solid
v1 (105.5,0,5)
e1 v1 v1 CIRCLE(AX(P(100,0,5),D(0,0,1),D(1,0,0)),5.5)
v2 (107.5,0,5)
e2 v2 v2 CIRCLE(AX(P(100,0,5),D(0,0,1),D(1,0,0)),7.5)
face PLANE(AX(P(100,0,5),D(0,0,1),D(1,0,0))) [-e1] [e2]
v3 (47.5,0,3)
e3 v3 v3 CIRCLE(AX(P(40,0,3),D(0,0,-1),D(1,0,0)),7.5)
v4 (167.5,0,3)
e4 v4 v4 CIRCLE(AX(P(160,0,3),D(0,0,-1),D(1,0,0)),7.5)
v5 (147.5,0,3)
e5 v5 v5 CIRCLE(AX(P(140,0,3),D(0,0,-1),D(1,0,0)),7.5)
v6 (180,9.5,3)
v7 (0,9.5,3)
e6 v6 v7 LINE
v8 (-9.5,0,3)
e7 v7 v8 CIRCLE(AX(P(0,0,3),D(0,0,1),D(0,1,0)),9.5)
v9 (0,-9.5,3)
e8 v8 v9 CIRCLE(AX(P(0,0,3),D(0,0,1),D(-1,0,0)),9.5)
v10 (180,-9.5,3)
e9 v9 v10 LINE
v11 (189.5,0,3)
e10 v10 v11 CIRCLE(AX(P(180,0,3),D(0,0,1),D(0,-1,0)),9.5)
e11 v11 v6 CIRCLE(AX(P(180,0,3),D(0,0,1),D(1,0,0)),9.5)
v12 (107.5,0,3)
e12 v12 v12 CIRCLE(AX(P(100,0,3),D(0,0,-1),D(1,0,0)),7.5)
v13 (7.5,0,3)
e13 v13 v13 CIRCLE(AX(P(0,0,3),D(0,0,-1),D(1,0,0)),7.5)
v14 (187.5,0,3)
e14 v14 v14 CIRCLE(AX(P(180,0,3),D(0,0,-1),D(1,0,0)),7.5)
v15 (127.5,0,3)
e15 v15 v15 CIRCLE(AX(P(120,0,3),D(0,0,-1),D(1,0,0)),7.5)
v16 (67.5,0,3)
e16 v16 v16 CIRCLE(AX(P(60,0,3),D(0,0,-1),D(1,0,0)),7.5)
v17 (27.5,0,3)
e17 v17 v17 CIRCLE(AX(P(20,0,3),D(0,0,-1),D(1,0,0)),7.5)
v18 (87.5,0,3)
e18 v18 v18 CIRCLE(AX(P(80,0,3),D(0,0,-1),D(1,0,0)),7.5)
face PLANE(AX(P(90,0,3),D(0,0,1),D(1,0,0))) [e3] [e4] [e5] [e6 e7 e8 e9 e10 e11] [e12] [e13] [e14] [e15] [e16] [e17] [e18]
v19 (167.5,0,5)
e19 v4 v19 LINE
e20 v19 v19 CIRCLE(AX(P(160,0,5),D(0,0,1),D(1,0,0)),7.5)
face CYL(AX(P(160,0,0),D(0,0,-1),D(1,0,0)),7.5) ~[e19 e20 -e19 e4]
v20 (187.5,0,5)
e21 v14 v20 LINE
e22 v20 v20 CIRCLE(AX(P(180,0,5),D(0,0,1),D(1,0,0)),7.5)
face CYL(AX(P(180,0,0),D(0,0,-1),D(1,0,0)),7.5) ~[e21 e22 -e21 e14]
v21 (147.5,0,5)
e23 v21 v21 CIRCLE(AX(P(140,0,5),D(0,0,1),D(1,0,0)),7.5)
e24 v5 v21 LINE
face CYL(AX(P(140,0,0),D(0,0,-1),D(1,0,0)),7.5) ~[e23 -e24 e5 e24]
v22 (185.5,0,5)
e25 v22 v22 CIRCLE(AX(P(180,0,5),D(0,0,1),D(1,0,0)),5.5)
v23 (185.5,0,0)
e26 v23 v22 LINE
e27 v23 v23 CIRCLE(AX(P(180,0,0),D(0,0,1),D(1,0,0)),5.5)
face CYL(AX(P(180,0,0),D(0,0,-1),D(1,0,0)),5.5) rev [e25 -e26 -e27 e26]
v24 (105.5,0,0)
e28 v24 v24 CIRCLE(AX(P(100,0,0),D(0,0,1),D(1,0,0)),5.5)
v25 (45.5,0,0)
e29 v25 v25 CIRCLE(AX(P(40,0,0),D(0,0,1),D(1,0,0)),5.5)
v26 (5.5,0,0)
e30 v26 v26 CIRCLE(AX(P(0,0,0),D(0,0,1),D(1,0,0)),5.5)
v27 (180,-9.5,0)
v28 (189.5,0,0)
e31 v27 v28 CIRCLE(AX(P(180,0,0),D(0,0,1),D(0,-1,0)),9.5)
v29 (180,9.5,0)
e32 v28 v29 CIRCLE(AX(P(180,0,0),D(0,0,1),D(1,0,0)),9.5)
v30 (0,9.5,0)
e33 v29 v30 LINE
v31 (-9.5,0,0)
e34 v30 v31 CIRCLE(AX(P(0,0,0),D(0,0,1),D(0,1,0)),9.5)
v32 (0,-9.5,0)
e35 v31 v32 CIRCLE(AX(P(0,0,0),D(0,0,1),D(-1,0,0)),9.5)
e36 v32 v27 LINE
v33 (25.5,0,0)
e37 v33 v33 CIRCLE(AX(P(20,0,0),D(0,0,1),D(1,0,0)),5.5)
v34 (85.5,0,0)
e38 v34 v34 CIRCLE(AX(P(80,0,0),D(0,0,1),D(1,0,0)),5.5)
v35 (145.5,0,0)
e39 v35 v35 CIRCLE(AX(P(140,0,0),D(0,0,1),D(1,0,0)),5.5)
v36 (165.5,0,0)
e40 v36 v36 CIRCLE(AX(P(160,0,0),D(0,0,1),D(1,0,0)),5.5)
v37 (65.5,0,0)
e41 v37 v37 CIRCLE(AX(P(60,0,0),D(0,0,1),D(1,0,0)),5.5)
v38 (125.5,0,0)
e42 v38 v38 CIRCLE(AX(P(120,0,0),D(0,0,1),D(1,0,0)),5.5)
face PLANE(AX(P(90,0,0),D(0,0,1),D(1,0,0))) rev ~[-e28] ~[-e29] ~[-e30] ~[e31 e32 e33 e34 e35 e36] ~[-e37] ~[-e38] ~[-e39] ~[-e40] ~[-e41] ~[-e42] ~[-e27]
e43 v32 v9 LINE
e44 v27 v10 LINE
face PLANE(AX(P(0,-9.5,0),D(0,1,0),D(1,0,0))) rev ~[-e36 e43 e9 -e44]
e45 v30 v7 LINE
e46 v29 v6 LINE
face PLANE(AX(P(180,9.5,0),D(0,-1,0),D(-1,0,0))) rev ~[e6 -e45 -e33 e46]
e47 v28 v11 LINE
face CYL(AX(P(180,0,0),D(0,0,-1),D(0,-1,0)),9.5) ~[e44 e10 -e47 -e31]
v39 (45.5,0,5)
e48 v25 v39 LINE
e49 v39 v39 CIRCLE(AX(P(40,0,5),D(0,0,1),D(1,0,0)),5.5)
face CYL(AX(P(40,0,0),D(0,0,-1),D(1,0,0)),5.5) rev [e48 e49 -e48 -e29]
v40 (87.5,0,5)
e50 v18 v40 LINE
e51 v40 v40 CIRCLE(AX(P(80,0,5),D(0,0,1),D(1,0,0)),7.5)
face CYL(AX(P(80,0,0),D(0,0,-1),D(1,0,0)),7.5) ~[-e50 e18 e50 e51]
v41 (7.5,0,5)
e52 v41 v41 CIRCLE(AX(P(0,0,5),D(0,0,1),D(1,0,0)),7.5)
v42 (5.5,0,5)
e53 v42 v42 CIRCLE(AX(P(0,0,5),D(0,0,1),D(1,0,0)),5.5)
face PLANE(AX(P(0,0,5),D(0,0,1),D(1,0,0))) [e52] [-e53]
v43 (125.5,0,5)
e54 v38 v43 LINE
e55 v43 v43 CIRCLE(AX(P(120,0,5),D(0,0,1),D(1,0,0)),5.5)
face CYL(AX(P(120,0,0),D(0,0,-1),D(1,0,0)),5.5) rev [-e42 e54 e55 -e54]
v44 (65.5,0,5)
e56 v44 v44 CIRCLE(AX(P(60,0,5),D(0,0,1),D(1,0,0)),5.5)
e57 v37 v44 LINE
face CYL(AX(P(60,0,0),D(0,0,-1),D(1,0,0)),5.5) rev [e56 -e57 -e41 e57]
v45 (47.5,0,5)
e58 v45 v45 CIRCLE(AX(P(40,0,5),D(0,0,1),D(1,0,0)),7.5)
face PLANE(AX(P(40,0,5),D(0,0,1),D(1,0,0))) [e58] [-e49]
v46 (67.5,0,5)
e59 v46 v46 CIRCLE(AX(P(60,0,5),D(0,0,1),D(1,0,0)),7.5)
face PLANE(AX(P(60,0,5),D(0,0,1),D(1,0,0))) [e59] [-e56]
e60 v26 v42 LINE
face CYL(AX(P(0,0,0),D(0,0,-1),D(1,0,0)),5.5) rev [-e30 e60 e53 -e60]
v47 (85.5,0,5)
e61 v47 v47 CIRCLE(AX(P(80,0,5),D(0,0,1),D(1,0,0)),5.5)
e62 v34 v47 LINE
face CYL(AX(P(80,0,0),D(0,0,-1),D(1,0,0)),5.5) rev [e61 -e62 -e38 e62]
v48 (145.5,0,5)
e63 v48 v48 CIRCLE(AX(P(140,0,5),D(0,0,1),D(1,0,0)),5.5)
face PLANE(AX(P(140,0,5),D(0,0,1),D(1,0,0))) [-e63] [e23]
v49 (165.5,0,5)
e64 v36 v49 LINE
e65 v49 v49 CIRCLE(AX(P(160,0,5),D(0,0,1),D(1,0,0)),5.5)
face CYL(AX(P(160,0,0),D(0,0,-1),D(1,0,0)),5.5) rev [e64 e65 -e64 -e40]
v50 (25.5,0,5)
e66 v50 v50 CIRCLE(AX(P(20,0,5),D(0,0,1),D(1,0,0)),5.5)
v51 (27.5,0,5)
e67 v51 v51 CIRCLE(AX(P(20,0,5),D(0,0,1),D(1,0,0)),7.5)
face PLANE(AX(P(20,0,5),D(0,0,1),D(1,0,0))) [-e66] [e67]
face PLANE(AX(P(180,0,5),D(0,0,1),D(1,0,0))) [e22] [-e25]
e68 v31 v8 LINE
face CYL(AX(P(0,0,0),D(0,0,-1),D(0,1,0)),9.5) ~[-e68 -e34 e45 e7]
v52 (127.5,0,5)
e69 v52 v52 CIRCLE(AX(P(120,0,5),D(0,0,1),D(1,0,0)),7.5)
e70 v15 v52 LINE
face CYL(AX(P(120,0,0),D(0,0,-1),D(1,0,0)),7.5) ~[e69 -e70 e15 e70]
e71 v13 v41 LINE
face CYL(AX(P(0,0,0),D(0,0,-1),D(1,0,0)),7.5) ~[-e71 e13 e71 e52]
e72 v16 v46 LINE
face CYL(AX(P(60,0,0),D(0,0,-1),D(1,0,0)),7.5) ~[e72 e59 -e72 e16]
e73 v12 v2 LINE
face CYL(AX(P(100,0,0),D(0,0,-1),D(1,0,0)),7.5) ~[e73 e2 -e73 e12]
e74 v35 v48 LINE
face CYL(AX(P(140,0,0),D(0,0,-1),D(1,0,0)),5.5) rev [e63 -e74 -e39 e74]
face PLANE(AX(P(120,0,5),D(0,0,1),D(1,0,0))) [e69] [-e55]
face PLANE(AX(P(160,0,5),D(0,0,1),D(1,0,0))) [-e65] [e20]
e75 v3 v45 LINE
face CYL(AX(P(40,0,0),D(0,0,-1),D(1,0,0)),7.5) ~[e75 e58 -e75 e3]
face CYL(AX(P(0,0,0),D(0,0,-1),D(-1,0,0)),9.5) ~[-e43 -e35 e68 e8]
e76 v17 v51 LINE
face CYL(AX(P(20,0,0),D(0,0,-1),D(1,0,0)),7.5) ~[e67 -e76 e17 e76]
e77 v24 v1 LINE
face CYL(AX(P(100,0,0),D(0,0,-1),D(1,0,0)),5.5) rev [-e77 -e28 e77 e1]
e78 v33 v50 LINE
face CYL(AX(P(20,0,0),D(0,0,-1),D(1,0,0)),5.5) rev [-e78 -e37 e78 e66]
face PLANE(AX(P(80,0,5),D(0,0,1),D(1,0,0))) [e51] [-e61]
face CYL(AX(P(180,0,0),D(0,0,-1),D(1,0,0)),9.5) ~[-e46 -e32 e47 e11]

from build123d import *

# Parameters (mm, degrees)
F2_R     = 7.5
F2_R_2   = 5.5
F3_DEPTH = 3
F4_DEPTH = 5


# Not quite as in the source:
# - a feature names something its author has since deleted; it is built from what else it names


with BuildPart() as f3:
    # F2 (on Top) → F3 (new body)
    with BuildSketch(Plane.XY):
        with BuildLine():
            Line((180, 9.5), (0, 9.5))
            ThreePointArc((0, 9.5), (-6.7175144213, 6.7175144213), (-9.5, 0))
            ThreePointArc((-9.5, 0), (-6.7175144213, -6.7175144213), (0, -9.5))
            Line((0, -9.5), (180, -9.5))
            ThreePointArc((180, -9.5), (186.7175144213, -6.7175144213), (189.5, 0))
            ThreePointArc((189.5, 0), (186.7175144213, 6.7175144213), (180, 9.5))
        make_face()
        Circle(F2_R, mode=Mode.SUBTRACT)
        with Locations((20, 0)):
            Circle(F2_R, mode=Mode.SUBTRACT)
        with Locations((40, 0)):
            Circle(F2_R, mode=Mode.SUBTRACT)
        with Locations((60, 0)):
            Circle(F2_R, mode=Mode.SUBTRACT)
        with Locations((80, 0)):
            Circle(F2_R, mode=Mode.SUBTRACT)
        with Locations((100, 0)):
            Circle(F2_R, mode=Mode.SUBTRACT)
        with Locations((120, 0)):
            Circle(F2_R, mode=Mode.SUBTRACT)
        with Locations((140, 0)):
            Circle(F2_R, mode=Mode.SUBTRACT)
        with Locations((160, 0)):
            Circle(F2_R, mode=Mode.SUBTRACT)
        with Locations((180, 0)):
            Circle(F2_R, mode=Mode.SUBTRACT)
        Circle(F2_R)
        Circle(F2_R_2, mode=Mode.SUBTRACT)
        with Locations((20, 0)):
            Circle(F2_R)
        with Locations((20, 0)):
            Circle(F2_R_2, mode=Mode.SUBTRACT)
        with Locations((40, 0)):
            Circle(F2_R)
        with Locations((40, 0)):
            Circle(F2_R_2, mode=Mode.SUBTRACT)
        with Locations((60, 0)):
            Circle(F2_R)
        with Locations((60, 0)):
            Circle(F2_R_2, mode=Mode.SUBTRACT)
        with Locations((80, 0)):
            Circle(F2_R)
        with Locations((80, 0)):
            Circle(F2_R_2, mode=Mode.SUBTRACT)
        with Locations((100, 0)):
            Circle(F2_R)
        with Locations((100, 0)):
            Circle(F2_R_2, mode=Mode.SUBTRACT)
        with Locations((120, 0)):
            Circle(F2_R)
        with Locations((120, 0)):
            Circle(F2_R_2, mode=Mode.SUBTRACT)
        with Locations((140, 0)):
            Circle(F2_R)
        with Locations((140, 0)):
            Circle(F2_R_2, mode=Mode.SUBTRACT)
        with Locations((160, 0)):
            Circle(F2_R)
        with Locations((160, 0)):
            Circle(F2_R_2, mode=Mode.SUBTRACT)
        with Locations((180, 0)):
            Circle(F2_R)
        with Locations((180, 0)):
            Circle(F2_R_2, mode=Mode.SUBTRACT)
    extrude(amount=F3_DEPTH)

    # F2 (on Top) → F4 (join)
    with BuildSketch(Plane.XY):
        Circle(F2_R)
        Circle(F2_R_2, mode=Mode.SUBTRACT)
        with Locations((20, 0)):
            Circle(F2_R)
        with Locations((20, 0)):
            Circle(F2_R_2, mode=Mode.SUBTRACT)
        with Locations((40, 0)):
            Circle(F2_R)
        with Locations((40, 0)):
            Circle(F2_R_2, mode=Mode.SUBTRACT)
        with Locations((60, 0)):
            Circle(F2_R)
        with Locations((60, 0)):
            Circle(F2_R_2, mode=Mode.SUBTRACT)
        with Locations((80, 0)):
            Circle(F2_R)
        with Locations((80, 0)):
            Circle(F2_R_2, mode=Mode.SUBTRACT)
        with Locations((100, 0)):
            Circle(F2_R)
        with Locations((100, 0)):
            Circle(F2_R_2, mode=Mode.SUBTRACT)
        with Locations((120, 0)):
            Circle(F2_R)
        with Locations((120, 0)):
            Circle(F2_R_2, mode=Mode.SUBTRACT)
        with Locations((140, 0)):
            Circle(F2_R)
        with Locations((140, 0)):
            Circle(F2_R_2, mode=Mode.SUBTRACT)
        with Locations((160, 0)):
            Circle(F2_R)
        with Locations((160, 0)):
            Circle(F2_R_2, mode=Mode.SUBTRACT)
        with Locations((180, 0)):
            Circle(F2_R)
        with Locations((180, 0)):
            Circle(F2_R_2, mode=Mode.SUBTRACT)
    extrude(amount=F4_DEPTH)


solid = f3.part
